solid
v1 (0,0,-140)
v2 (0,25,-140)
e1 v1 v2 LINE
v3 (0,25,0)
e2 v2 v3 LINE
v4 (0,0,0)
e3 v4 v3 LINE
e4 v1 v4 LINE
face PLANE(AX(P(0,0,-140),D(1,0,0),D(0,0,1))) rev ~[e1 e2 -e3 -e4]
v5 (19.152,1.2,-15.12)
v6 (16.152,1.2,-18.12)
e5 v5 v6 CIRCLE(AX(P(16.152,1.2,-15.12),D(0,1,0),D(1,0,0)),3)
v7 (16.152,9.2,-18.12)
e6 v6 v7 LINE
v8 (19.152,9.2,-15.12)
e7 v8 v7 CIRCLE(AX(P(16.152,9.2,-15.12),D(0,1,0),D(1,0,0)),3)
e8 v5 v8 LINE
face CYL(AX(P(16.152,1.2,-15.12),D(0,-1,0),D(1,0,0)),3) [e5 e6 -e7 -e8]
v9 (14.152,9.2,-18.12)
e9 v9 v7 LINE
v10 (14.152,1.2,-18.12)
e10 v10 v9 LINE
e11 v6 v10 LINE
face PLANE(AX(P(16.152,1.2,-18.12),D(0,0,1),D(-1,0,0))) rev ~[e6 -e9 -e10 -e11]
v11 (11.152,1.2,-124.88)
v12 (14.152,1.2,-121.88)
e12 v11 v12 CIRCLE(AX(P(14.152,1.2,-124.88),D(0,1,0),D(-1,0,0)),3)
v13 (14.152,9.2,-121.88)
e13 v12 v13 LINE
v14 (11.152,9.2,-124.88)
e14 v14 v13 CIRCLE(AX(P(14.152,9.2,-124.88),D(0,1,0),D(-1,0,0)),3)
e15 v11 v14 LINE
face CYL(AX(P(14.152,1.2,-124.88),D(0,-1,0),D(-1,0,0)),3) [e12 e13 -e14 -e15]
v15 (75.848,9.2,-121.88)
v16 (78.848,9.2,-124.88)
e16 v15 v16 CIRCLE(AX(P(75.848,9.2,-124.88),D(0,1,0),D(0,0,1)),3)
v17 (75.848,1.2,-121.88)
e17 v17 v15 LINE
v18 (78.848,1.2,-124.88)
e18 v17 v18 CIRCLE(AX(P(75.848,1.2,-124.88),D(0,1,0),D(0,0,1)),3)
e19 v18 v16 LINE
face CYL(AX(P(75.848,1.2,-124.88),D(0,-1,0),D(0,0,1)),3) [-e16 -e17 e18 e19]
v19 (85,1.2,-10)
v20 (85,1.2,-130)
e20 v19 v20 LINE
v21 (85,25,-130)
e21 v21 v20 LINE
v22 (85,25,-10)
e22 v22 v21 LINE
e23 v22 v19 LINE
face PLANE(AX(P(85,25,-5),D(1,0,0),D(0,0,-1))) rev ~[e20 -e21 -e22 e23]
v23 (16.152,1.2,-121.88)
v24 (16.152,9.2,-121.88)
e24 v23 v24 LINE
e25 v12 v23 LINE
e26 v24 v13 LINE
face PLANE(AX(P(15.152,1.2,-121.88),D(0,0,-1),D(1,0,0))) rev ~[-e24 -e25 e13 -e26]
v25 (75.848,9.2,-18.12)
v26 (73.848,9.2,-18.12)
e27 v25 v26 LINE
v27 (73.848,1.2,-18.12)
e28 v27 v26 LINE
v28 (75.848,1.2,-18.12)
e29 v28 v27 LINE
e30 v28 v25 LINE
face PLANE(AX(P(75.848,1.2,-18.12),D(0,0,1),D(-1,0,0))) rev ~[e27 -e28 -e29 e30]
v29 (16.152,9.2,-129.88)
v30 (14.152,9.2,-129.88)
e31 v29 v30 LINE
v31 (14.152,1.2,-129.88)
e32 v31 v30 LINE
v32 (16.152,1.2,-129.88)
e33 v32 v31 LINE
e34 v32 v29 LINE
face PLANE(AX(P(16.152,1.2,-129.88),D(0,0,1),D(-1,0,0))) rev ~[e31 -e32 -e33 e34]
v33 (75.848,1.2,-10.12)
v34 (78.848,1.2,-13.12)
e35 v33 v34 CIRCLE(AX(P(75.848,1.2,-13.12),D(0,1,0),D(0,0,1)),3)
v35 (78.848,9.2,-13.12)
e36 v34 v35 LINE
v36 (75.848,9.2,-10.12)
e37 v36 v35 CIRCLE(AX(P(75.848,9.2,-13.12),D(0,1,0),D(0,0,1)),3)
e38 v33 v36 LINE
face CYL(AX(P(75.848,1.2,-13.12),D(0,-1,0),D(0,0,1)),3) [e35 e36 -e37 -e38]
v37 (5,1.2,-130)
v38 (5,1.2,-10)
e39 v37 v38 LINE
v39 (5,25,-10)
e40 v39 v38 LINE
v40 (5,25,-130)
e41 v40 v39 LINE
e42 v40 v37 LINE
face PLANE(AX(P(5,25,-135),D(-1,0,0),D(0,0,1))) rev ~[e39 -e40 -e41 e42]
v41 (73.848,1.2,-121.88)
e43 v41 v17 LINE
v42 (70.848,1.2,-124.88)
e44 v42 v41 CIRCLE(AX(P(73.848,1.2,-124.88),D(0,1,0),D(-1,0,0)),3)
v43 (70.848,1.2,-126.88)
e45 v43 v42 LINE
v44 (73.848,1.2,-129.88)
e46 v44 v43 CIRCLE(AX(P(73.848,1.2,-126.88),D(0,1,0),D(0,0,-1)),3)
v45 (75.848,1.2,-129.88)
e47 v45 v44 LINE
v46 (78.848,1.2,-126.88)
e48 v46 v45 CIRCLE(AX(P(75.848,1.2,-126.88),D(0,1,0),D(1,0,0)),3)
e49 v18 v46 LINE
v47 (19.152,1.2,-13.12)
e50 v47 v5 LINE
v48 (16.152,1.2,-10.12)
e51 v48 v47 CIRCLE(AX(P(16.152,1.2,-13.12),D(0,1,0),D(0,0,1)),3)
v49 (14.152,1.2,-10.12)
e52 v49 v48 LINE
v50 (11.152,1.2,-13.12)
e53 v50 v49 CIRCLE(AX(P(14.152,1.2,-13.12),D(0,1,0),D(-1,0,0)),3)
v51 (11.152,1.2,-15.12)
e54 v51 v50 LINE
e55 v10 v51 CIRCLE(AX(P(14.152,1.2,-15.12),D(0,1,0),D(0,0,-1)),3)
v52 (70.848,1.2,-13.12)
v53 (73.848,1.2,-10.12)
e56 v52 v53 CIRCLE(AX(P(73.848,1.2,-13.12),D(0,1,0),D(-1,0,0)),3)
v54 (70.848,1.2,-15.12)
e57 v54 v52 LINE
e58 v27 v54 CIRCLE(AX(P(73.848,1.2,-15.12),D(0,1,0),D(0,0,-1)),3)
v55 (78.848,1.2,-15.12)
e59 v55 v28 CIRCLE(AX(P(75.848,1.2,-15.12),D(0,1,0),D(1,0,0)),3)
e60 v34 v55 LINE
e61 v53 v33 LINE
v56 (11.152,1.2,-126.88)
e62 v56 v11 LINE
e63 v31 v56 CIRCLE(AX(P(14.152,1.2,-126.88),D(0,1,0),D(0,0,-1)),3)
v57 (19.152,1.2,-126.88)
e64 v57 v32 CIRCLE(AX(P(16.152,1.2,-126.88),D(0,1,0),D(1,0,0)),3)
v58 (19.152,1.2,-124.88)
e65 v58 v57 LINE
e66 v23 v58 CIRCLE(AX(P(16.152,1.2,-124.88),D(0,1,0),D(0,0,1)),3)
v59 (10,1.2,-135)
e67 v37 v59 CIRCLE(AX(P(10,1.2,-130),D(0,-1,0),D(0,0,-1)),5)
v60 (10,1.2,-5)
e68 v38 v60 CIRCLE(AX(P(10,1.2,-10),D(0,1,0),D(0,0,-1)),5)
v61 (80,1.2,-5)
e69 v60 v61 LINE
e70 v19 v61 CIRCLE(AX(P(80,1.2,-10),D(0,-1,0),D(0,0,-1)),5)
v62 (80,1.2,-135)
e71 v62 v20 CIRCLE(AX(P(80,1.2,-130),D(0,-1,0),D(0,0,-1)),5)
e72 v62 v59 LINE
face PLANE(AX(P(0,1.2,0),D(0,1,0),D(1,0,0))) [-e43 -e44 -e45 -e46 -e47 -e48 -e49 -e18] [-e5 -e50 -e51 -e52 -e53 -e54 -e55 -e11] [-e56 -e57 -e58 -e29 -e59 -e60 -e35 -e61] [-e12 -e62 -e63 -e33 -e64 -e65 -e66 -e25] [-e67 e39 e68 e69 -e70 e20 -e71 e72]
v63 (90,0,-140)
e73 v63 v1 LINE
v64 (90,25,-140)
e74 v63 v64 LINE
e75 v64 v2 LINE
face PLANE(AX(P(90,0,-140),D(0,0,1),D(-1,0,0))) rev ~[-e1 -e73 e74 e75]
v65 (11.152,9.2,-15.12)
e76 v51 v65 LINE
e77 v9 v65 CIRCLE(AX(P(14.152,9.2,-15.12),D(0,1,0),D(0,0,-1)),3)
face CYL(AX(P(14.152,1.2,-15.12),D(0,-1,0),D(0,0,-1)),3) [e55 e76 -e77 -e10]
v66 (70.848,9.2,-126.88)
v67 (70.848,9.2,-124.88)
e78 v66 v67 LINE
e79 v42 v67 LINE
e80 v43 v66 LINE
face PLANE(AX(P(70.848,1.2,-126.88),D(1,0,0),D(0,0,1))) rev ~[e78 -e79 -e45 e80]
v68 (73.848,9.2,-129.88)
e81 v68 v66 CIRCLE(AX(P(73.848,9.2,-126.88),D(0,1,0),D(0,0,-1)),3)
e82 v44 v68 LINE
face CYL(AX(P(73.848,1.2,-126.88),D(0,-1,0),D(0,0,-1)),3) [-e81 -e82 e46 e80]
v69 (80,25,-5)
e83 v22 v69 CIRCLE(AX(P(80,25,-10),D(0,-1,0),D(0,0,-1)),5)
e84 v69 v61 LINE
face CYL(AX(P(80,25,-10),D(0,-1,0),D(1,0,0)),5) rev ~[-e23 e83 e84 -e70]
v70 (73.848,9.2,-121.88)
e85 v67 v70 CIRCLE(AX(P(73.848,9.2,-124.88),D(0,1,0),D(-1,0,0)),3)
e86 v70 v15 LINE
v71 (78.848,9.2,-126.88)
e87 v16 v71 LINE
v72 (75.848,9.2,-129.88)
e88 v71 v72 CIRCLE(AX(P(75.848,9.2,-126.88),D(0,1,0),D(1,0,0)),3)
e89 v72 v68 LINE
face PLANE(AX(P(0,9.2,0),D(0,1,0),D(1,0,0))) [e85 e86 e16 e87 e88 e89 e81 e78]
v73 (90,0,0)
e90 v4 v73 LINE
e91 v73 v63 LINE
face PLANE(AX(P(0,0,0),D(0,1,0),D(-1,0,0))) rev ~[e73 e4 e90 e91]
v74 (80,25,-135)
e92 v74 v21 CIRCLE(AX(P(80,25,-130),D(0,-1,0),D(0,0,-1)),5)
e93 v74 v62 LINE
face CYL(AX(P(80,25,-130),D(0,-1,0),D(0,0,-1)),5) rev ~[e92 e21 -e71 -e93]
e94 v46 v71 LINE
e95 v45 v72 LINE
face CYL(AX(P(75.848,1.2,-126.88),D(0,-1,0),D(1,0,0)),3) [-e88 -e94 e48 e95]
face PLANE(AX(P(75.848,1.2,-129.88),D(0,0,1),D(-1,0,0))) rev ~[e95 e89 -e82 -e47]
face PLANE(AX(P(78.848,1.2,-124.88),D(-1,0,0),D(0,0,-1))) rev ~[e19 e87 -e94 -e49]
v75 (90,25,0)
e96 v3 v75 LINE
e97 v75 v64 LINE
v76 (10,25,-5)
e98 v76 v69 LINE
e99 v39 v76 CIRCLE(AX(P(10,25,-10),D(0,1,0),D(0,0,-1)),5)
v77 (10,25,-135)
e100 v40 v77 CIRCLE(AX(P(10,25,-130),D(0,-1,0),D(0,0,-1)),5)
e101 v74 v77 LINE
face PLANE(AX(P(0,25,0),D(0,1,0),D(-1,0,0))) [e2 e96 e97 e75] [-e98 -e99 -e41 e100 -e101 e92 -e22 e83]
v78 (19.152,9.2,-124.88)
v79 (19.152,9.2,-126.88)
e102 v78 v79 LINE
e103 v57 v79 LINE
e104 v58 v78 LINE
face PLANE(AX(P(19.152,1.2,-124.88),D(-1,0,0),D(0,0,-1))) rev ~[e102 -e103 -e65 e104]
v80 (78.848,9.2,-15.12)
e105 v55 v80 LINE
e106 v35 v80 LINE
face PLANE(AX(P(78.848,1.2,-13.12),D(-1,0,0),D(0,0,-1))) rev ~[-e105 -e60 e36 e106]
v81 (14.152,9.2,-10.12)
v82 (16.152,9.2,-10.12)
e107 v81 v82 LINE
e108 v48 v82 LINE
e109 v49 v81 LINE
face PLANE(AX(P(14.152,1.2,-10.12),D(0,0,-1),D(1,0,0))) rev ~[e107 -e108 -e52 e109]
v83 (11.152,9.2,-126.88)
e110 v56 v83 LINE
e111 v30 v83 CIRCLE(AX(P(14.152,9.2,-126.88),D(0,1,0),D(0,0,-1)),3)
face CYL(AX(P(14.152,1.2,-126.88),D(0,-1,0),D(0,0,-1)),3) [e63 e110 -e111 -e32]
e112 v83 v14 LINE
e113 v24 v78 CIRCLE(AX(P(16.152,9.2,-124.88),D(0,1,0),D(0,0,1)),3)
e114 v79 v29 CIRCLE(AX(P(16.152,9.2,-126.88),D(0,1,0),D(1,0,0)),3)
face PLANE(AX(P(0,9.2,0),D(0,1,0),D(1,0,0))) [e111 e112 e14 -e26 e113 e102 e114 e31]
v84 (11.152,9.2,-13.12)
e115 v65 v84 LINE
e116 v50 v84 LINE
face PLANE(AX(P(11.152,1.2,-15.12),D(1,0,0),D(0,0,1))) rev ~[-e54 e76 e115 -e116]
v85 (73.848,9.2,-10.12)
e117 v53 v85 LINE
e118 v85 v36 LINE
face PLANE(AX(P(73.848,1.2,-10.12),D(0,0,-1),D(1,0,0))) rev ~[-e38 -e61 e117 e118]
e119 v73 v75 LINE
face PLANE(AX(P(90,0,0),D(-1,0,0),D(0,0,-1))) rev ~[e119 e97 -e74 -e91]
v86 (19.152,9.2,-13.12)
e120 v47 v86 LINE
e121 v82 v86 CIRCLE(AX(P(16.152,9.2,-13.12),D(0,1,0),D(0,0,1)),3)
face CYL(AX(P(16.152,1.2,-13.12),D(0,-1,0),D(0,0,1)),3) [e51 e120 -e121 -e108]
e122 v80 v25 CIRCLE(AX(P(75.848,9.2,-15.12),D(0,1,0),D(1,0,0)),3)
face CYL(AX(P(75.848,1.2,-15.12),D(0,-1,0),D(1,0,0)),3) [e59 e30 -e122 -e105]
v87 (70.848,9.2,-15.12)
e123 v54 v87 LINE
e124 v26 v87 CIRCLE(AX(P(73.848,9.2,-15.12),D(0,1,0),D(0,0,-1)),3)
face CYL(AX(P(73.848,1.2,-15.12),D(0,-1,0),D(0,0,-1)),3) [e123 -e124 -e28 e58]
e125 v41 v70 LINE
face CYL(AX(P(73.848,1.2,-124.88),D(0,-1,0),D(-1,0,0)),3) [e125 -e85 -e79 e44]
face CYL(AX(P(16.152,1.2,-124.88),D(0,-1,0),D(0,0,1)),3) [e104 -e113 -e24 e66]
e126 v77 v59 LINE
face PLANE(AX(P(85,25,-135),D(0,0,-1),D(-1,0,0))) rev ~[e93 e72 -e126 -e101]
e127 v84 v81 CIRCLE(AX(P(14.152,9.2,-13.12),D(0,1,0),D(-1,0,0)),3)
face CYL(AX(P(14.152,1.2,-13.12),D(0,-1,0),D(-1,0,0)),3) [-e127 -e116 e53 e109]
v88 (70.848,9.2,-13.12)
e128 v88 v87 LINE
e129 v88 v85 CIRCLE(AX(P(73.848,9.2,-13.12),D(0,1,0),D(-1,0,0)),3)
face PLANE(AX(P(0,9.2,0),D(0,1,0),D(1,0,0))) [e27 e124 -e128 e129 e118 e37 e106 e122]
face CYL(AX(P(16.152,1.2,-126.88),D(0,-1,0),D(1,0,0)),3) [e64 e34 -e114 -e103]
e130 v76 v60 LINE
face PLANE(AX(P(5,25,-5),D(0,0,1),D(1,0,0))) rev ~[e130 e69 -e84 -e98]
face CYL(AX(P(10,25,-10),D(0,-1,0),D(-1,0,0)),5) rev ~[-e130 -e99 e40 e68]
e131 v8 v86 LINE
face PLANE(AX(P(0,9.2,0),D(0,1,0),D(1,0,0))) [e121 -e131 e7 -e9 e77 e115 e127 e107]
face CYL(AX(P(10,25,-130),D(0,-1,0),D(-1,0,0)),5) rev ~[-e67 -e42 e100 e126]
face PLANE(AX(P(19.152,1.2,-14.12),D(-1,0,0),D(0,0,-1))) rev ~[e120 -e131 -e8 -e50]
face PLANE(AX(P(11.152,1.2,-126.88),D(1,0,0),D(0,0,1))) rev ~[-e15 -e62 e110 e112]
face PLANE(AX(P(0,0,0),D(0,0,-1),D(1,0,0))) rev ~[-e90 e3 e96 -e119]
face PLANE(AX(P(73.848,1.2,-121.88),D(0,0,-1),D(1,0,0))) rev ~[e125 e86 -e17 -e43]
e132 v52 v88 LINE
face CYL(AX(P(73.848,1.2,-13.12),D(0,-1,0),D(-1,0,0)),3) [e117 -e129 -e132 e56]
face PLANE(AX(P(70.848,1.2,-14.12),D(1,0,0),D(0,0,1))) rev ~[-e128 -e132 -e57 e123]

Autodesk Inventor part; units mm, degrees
ref_plane "YZ Plane" through (0, 0, 0) normal (1, 0, 0) x (0, 1, 0)
ref_plane "XZ Plane" through (0, 0, 0) normal (0, 1, 0) x (-1, 0, 0)
ref_plane "XY Plane" through (0, 0, 0) normal (0, 0, 1) x (1, 0, 0)
sketch "草图1" plane through (0, 0, 0) normal (0, 1, 0) x (-1, 0, 0)
  line L0 (0, 0) -> (-90, 0)
  line L1 (-90, 0) -> (-90, -140)
  line L2 (-90, -140) -> (0, -140)
  line L3 (0, -140) -> (0, 0)
  point P0 (-45, -70)
  dimension "d0" = 140
  dimension "d1" = 90
extrude "拉伸1" add sketch "草图1" along normal blind 25
sketch "草图2" plane through (0, 25, 0) normal (0, 1, 0) x (1, 0, 0)
  line L0 (90, 0) -> (90, 140) projected
  line L1 (90, 140) -> (0, 140) projected
  line L2 (0, 140) -> (0, 0) projected
  line L3 (0, 0) -> (90, 0) projected
  line L4 (5, 5) -> (85, 5)
  line L5 (85, 5) -> (85, 135)
  line L6 (85, 135) -> (5, 135)
  line L7 (5, 135) -> (5, 5)
  line L8 (5, 5) -> (85, 135) construction
  line L9 (85, 5) -> (5, 135) construction
  point P0 (45, 70)
  dimension "d4" = 80
  dimension "d5" = 130
extrude "拉伸2" cut sketch "草图2" against normal blind 23.8 contours L7 L6 L5 L4
fillet "面圆角1" radius 5 1 edges at (5, 13.1, -5)
fillet "面圆角2" radius 5 1 edges at (5, 13.1, -135)
fillet "面圆角3" radius 5 1 edges at (85, 13.1, -135)
fillet "面圆角4" radius 5 1 edges at (85, 13.1, -5)
sketch "草图4" plane through (0, 1.2, 0) normal (0, 1, 0) x (1, 0, 0)
  arc A0 (80, 5) -> (85, 10) centre (80, 10) ccw projected
  line L0 (85, 130) -> (85, 10) projected
  arc A1 (85, 130) -> (80, 135) centre (80, 130) ccw projected
  line L1 (10, 135) -> (80, 135) projected
  arc A2 (10, 135) -> (5, 130) centre (10, 130) ccw projected
  line L2 (5, 10) -> (5, 130) projected
  arc A3 (5, 10) -> (10, 5) centre (10, 10) ccw projected
  line L3 (80, 5) -> (10, 5) projected
  line L4 (16.152, 18.12) -> (14.152, 18.12)
  line L5 (11.152, 15.12) -> (11.152, 13.12)
  line L6 (14.152, 10.12) -> (16.152, 10.12)
  line L7 (19.152, 13.12) -> (19.152, 15.12)
  line L8 (19.152, 18.12) -> (11.152, 10.12) construction
  line L9 (11.152, 18.12) -> (19.152, 10.12) construction
  arc A4 (11.152, 13.12) -> (14.152, 10.12) centre (14.152, 13.12) ccw
  arc A5 (16.152, 10.12) -> (19.152, 13.12) centre (16.152, 13.12) ccw
  arc A6 (19.152, 15.12) -> (16.152, 18.12) centre (16.152, 15.12) ccw
  arc A7 (14.152, 18.12) -> (11.152, 15.12) centre (14.152, 15.12) ccw
  line L10 (15.152, 14.12) -> (74.848, 14.12)
  line L11 (15.152, 14.12) -> (15.152, 125.88)
  line L12 (70.848, 15.12) -> (70.848, 13.12)
  arc A8 (70.848, 13.12) -> (73.848, 10.12) centre (73.848, 13.12) ccw
  line L13 (73.848, 10.12) -> (75.848, 10.12)
  arc A9 (75.848, 10.12) -> (78.848, 13.12) centre (75.848, 13.12) ccw
  line L14 (78.848, 13.12) -> (78.848, 15.12)
  arc A10 (78.848, 15.12) -> (75.848, 18.12) centre (75.848, 15.12) ccw
  line L15 (75.848, 18.12) -> (73.848, 18.12)
  arc A11 (73.848, 18.12) -> (70.848, 15.12) centre (73.848, 15.12) ccw
  line L16 (11.152, 126.88) -> (11.152, 124.88)
  arc A12 (11.152, 124.88) -> (14.152, 121.88) centre (14.152, 124.88) ccw
  line L17 (14.152, 121.88) -> (16.152, 121.88)
  arc A13 (16.152, 121.88) -> (19.152, 124.88) centre (16.152, 124.88) ccw
  line L18 (19.152, 124.88) -> (19.152, 126.88)
  arc A14 (19.152, 126.88) -> (16.152, 129.88) centre (16.152, 126.88) ccw
  line L19 (16.152, 129.88) -> (14.152, 129.88)
  arc A15 (14.152, 129.88) -> (11.152, 126.88) centre (14.152, 126.88) ccw
  line L20 (70.848, 126.88) -> (70.848, 124.88)
  arc A16 (70.848, 124.88) -> (73.848, 121.88) centre (73.848, 124.88) ccw
  line L21 (73.848, 121.88) -> (75.848, 121.88)
  arc A17 (75.848, 121.88) -> (78.848, 124.88) centre (75.848, 124.88) ccw
  line L22 (78.848, 124.88) -> (78.848, 126.88)
  arc A18 (78.848, 126.88) -> (75.848, 129.88) centre (75.848, 126.88) ccw
  line L23 (75.848, 129.88) -> (73.848, 129.88)
  arc A19 (73.848, 129.88) -> (70.848, 126.88) centre (73.848, 126.88) ccw
  point P0 (0, 0)
  point P1 (45, 70)
  point P2 (45, 70)
  point P3 (70.848, 10.12)
  point P4 (70.848, 18.12)
  point P5 (78.848, 10.12)
  point P6 (78.848, 18.12)
  point P7 (11.152, 121.88)
  point P8 (11.152, 129.88)
  point P9 (19.152, 121.88)
  point P10 (19.152, 129.88)
  point P11 (70.848, 121.88)
  point P12 (70.848, 129.88)
  point P13 (78.848, 121.88)
  point P14 (78.848, 129.88)
  dimension "d12" = 55.88
  dimension "d13" = 29.848
  dimension "d14" = 8
  dimension "d15" = 8
  dimension "d16" = 3
  dimension "d17" = 59.696
  dimension "d18" = 111.76
  dimension "d21" = 59.696
  dimension "d24" = 111.76
extrude "拉伸3" add sketch "草图4" along normal blind 8 contours A6 L7 L10 L11 L4 | L11 L10 L7 A5 L6 A4 L5 A7 L4 | A11 L15 A10 L14 A9 L13 A8 L12 | A15 L19 A14 L18 A13 L17 A12 L16 | A19 L23 A18 L22 A17 L21 A16 L20
properties part number "PrismGC"
